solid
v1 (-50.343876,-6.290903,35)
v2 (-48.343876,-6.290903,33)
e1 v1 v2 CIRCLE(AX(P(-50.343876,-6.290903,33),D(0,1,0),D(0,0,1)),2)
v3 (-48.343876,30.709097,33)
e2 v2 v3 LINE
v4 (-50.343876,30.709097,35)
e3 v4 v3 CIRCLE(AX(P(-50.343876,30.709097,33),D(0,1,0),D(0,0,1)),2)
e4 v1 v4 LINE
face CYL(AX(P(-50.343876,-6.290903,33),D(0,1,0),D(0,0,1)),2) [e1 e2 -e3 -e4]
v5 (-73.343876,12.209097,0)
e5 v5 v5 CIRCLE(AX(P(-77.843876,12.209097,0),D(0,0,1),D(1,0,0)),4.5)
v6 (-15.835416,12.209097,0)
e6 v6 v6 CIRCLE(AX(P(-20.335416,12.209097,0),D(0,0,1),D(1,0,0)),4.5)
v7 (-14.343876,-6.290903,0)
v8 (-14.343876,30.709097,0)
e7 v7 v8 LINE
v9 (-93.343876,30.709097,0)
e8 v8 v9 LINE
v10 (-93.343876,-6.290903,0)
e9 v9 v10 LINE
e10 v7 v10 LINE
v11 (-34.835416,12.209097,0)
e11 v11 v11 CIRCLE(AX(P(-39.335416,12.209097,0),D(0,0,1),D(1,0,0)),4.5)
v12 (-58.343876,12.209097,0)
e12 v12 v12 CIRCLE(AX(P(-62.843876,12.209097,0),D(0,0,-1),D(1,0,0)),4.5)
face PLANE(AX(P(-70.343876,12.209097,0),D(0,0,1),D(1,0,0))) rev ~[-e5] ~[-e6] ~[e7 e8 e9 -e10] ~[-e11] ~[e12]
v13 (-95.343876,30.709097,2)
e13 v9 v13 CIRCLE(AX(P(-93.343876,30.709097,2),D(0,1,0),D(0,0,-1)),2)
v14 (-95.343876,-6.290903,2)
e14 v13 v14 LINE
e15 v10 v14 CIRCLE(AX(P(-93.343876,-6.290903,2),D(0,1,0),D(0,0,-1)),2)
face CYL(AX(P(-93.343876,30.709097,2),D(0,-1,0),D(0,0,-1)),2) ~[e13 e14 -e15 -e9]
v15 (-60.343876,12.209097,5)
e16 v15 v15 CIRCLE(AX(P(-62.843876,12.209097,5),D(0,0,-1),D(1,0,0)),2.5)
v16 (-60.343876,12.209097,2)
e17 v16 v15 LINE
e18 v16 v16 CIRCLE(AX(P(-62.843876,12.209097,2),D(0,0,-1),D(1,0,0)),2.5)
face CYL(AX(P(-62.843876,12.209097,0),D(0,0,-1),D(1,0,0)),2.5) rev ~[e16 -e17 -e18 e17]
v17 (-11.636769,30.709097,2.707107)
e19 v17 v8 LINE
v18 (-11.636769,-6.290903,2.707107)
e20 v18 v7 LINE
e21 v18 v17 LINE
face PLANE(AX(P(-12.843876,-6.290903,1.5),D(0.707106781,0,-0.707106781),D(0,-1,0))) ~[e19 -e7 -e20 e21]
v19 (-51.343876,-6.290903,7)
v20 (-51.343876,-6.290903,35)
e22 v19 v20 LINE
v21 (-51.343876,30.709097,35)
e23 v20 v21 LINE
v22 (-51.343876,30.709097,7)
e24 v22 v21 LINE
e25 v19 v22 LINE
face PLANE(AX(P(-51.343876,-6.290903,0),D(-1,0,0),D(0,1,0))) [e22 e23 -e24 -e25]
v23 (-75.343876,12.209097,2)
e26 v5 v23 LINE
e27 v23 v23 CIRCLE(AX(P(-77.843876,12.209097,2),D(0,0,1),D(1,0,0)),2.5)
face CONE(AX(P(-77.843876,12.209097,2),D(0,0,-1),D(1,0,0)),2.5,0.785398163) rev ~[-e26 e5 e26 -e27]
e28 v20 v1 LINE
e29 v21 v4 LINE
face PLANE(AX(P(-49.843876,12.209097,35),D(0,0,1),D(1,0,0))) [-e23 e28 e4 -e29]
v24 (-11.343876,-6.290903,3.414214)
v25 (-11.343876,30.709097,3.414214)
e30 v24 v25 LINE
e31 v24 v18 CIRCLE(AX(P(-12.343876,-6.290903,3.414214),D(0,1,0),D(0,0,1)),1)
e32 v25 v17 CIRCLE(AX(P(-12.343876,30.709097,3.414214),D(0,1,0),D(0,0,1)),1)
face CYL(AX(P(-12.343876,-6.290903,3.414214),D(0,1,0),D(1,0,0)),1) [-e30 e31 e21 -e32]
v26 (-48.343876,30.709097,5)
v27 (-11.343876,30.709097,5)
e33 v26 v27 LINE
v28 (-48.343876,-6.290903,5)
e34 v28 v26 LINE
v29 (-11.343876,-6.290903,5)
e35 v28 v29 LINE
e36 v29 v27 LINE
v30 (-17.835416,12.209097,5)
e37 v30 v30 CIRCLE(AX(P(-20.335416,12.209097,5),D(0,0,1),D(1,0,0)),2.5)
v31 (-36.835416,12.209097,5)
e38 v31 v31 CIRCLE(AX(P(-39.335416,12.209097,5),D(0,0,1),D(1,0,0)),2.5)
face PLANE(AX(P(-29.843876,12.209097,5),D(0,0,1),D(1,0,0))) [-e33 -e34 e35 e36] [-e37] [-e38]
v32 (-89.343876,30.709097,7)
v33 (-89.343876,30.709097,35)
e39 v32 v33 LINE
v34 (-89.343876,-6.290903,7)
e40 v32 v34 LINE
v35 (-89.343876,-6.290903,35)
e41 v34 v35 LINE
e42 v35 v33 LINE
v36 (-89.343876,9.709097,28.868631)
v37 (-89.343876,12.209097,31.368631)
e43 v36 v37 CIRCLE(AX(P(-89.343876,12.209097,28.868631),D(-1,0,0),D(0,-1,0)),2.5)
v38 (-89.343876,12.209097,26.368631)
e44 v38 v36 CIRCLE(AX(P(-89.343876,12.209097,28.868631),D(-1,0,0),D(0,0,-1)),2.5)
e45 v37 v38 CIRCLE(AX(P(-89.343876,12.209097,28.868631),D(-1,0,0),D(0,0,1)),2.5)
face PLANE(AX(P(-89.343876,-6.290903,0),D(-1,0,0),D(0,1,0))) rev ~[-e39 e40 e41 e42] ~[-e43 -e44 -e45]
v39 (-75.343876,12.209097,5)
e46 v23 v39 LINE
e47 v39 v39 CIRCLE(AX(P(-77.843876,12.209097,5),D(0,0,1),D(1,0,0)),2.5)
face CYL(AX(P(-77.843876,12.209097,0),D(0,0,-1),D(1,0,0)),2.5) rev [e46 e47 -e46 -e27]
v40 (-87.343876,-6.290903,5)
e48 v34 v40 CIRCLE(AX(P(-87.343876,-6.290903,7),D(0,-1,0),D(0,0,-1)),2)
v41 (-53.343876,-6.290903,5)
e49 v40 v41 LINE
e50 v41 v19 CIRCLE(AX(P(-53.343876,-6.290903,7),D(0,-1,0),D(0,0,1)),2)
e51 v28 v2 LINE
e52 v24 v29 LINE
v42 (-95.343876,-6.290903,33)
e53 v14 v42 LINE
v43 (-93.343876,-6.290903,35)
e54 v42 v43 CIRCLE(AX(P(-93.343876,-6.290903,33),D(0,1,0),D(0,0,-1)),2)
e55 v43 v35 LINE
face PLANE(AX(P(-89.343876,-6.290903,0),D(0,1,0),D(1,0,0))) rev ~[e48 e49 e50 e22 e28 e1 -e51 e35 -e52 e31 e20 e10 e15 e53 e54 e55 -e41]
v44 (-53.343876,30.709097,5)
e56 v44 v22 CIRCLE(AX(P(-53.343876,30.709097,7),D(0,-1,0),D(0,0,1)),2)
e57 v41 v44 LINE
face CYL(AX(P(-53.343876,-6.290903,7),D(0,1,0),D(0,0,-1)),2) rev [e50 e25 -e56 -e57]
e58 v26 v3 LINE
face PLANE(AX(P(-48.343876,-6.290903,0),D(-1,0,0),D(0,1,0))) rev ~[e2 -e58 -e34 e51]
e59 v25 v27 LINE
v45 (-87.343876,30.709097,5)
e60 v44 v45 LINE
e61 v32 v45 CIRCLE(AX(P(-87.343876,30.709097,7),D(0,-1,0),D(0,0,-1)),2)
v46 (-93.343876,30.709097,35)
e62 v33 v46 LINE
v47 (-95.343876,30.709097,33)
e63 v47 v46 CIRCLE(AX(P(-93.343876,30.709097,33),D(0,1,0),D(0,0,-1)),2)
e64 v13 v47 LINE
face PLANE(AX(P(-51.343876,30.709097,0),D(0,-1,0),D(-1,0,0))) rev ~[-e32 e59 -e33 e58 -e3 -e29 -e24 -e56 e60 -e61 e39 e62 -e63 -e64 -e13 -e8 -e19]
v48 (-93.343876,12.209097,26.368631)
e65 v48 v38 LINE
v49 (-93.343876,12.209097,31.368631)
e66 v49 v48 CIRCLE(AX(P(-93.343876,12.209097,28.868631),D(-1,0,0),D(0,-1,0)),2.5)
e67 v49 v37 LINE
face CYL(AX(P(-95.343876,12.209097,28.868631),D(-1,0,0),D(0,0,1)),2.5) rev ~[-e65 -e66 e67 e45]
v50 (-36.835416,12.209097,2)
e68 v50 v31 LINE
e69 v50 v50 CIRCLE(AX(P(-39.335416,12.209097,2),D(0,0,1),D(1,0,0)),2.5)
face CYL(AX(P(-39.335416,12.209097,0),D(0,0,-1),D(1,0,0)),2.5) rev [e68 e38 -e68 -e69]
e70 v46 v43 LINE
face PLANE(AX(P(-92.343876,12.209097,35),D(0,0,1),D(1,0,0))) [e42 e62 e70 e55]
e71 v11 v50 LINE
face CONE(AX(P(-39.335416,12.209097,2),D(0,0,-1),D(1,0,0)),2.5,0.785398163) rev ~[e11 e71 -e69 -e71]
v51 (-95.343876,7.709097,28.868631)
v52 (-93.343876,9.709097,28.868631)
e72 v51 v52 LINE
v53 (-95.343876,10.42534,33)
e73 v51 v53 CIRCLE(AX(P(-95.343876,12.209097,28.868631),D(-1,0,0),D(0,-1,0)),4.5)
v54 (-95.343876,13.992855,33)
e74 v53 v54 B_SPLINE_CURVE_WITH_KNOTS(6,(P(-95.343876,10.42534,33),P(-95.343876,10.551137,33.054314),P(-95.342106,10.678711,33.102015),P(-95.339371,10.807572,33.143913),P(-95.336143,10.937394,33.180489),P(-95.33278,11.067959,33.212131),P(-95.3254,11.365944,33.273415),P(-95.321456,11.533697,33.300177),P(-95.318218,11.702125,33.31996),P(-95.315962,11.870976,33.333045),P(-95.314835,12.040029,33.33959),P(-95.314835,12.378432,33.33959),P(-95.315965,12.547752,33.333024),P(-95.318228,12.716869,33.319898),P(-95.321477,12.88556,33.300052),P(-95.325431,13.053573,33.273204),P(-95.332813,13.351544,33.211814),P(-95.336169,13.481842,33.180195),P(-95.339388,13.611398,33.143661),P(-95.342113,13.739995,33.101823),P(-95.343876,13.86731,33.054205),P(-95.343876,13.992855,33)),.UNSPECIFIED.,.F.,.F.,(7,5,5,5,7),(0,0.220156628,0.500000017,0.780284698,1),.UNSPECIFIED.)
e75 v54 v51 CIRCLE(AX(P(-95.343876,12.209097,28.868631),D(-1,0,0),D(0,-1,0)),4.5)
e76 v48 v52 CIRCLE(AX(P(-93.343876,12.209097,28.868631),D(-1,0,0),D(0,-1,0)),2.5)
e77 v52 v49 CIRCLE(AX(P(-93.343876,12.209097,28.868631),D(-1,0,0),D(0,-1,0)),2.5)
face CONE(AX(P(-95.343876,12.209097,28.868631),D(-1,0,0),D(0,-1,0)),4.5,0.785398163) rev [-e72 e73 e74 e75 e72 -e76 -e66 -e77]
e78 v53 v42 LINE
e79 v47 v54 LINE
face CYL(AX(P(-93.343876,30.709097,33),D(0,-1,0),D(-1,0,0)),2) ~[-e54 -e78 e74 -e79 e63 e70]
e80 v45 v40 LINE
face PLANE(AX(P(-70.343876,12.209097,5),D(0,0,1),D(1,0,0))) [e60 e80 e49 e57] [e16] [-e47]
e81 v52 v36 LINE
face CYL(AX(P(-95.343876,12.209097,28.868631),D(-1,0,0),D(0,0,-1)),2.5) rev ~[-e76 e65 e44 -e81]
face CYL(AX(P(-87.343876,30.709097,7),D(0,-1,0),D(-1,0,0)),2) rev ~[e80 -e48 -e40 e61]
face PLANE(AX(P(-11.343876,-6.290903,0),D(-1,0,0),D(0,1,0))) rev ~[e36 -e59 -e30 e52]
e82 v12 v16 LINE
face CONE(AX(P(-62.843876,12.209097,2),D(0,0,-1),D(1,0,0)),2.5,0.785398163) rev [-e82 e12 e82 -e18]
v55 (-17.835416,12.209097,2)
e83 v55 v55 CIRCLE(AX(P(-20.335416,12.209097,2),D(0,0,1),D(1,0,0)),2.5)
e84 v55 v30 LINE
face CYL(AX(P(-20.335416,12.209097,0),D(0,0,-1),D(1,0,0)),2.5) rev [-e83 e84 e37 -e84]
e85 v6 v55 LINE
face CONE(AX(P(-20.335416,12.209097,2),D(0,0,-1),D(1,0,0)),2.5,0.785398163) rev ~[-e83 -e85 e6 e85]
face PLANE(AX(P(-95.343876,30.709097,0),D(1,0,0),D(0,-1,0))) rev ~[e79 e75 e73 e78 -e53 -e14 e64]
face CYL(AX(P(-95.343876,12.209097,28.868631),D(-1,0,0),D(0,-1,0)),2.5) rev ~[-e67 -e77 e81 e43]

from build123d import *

# Parameters (mm, degrees)
F1_DEPTH = 35
F0_W     = 3
F0_H     = 37
F0_R     = 2.5
F0_W_2   = 37
F2_DEPTH = 5
F3_R     = 2
F4_SIZE  = 3
F5_R     = 1
F6_SIZE  = 2
F7_R     = 2
F9_DEPTH = 12.5


# Not quite as in the source:
# - a fillet or chamfer that OpenCascade refuses, or shapes differently, is made with other operations: its cross-section is extruded or revolved along the edge and cut away or added
# - a feature names something its author has since deleted; it is built from what else it names


with BuildPart() as f1:
    # F0 (on Top) → F1 (new body)
    with BuildSketch(Plane.XY):
        Polygon((-89.3438757165, 12.2090974661), (-89.3438757165, 30.7090974661), (-95.3438757165, 30.7090974661), (-95.3438757165, -6.2909025339), (-89.3438757165, -6.2909025339), align=None)
    extrude(amount=F1_DEPTH)



with BuildPart() as f1b:
    # F0 (on Top) → F1, piece 2 (new body)
    with BuildSketch(Plane.XY):
        with Locations((-49.8438757165, 12.2090974661)):
            Rectangle(F0_W, F0_H)
    extrude(amount=F1_DEPTH)


with BuildPart() as f1_1:
    add(f1.part)

    add(f1b.part)  # F2 merges F1b
    # F0 (on Top) → F2 (join)
    with BuildSketch(Plane.XY):
        Polygon((-51.3438757165, 30.7090974661), (-89.3438757165, 30.7090974661), (-89.3438757165, 12.2090974661), (-89.3438757165, -6.2909025339), (-51.3438757165, -6.2909025339), align=None)
        with Locations((-77.8438757165, 12.2090974661)):
            Circle(F0_R, mode=Mode.SUBTRACT)
        with BuildLine():
            ThreePointArc((-65.3438757165, 12.2090974661), (-62.8438757165, 14.7090974661), (-60.3438757165, 12.2090974661))
            ThreePointArc((-60.3438757165, 12.2090974661), (-62.8438757165, 9.7090974661), (-65.3438757165, 12.2090974661))
        make_face(mode=Mode.SUBTRACT)
        with Locations((-29.8438757165, 12.2090974661)):
            Rectangle(F0_W_2, F0_H)
        with Locations((-39.3354164958, 12.2090974661)):
            Circle(F0_R, mode=Mode.SUBTRACT)
        with Locations((-20.3354164958, 12.2090974661)):
            Circle(F0_R, mode=Mode.SUBTRACT)
    extrude(amount=F2_DEPTH)

    # F3
    f3_edges = [f1_1.edges().sort_by_distance(p)[0] for p in [
        (-89.343876, 12.209097, 5),
        (-51.343876, 12.209097, 5),
        (-48.343876, 12.209097, 35),
    ]]
    fillet(f3_edges, radius=F3_R)

    # F4
    f4_edges = [f1_1.edges().sort_by_distance(p)[0] for p in [
        (-11.343876, 12.209097, 0),
    ]]
    chamfer(f4_edges, length=F4_SIZE)

    # F5
    f5_edges = [f1_1.edges().sort_by_distance(p)[0] for p in [
        (-11.343876, 12.209097, 3),
    ]]
    fillet(f5_edges, radius=F5_R)

    # F6
    f6_edges = [f1_1.edges().sort_by_distance(p)[0] for p in [
        (-65.343876, 12.209097, 0),
        (-41.835416, 12.209097, 0),
        (-22.835416, 12.209097, 0),
        (-80.343876, 12.209097, 0),
    ]]
    chamfer(f6_edges, length=F6_SIZE)

    # F7
    f7_edges = [f1_1.edges().sort_by_distance(p)[0] for p in [
        (-95.343876, 12.209097, 35),
        (-95.343876, 12.209097, 0),
    ]]
    fillet(f7_edges, radius=F7_R)

    # F8 (on face) → F9 (cut, symmetric)
    with BuildSketch(Plane(origin=(-95.3438757165, 0, 0), x_dir=(0, -1, 0), z_dir=(-1, 0, 0))):
        with BuildLine():
            ThreePointArc((-9.7090974661, 28.8686309451), (-10.4413305132, 30.636397898), (-12.2090974661, 31.3686309451))
            Line((-12.2090974661, 31.3686309451), (-12.2090974661, 26.3686309451))
            ThreePointArc((-12.2090974661, 26.3686309451), (-10.4413305132, 27.1008639921), (-9.7090974661, 28.8686309451))
        make_face()
        with BuildLine():
            Line((-12.2090974661, 26.3686309451), (-12.2090974661, 31.3686309451))
            ThreePointArc((-12.2090974661, 31.3686309451), (-14.7090974661, 28.8686309451), (-12.2090974661, 26.3686309451))
        make_face()
    extrude(amount=F9_DEPTH, both=True, mode=Mode.SUBTRACT)

    # F10: chamfer of 2 on 1 edges, made by hand

    # F10_s1 → F10_t2 (revolve, cut)
    with BuildSketch(Plane.XY.offset(28.8686309451)):
        Polygon((-95.3438757165, 7.7090974661), (-93.3438757165, 9.7090974661), (-95.3438757165, 9.7090974661), align=None)
    revolve(axis=Axis((-95.3438757165, 12.2090974661, 28.8686309451), (-1, 0, 0)), mode=Mode.SUBTRACT)


solid = f1_1.part
